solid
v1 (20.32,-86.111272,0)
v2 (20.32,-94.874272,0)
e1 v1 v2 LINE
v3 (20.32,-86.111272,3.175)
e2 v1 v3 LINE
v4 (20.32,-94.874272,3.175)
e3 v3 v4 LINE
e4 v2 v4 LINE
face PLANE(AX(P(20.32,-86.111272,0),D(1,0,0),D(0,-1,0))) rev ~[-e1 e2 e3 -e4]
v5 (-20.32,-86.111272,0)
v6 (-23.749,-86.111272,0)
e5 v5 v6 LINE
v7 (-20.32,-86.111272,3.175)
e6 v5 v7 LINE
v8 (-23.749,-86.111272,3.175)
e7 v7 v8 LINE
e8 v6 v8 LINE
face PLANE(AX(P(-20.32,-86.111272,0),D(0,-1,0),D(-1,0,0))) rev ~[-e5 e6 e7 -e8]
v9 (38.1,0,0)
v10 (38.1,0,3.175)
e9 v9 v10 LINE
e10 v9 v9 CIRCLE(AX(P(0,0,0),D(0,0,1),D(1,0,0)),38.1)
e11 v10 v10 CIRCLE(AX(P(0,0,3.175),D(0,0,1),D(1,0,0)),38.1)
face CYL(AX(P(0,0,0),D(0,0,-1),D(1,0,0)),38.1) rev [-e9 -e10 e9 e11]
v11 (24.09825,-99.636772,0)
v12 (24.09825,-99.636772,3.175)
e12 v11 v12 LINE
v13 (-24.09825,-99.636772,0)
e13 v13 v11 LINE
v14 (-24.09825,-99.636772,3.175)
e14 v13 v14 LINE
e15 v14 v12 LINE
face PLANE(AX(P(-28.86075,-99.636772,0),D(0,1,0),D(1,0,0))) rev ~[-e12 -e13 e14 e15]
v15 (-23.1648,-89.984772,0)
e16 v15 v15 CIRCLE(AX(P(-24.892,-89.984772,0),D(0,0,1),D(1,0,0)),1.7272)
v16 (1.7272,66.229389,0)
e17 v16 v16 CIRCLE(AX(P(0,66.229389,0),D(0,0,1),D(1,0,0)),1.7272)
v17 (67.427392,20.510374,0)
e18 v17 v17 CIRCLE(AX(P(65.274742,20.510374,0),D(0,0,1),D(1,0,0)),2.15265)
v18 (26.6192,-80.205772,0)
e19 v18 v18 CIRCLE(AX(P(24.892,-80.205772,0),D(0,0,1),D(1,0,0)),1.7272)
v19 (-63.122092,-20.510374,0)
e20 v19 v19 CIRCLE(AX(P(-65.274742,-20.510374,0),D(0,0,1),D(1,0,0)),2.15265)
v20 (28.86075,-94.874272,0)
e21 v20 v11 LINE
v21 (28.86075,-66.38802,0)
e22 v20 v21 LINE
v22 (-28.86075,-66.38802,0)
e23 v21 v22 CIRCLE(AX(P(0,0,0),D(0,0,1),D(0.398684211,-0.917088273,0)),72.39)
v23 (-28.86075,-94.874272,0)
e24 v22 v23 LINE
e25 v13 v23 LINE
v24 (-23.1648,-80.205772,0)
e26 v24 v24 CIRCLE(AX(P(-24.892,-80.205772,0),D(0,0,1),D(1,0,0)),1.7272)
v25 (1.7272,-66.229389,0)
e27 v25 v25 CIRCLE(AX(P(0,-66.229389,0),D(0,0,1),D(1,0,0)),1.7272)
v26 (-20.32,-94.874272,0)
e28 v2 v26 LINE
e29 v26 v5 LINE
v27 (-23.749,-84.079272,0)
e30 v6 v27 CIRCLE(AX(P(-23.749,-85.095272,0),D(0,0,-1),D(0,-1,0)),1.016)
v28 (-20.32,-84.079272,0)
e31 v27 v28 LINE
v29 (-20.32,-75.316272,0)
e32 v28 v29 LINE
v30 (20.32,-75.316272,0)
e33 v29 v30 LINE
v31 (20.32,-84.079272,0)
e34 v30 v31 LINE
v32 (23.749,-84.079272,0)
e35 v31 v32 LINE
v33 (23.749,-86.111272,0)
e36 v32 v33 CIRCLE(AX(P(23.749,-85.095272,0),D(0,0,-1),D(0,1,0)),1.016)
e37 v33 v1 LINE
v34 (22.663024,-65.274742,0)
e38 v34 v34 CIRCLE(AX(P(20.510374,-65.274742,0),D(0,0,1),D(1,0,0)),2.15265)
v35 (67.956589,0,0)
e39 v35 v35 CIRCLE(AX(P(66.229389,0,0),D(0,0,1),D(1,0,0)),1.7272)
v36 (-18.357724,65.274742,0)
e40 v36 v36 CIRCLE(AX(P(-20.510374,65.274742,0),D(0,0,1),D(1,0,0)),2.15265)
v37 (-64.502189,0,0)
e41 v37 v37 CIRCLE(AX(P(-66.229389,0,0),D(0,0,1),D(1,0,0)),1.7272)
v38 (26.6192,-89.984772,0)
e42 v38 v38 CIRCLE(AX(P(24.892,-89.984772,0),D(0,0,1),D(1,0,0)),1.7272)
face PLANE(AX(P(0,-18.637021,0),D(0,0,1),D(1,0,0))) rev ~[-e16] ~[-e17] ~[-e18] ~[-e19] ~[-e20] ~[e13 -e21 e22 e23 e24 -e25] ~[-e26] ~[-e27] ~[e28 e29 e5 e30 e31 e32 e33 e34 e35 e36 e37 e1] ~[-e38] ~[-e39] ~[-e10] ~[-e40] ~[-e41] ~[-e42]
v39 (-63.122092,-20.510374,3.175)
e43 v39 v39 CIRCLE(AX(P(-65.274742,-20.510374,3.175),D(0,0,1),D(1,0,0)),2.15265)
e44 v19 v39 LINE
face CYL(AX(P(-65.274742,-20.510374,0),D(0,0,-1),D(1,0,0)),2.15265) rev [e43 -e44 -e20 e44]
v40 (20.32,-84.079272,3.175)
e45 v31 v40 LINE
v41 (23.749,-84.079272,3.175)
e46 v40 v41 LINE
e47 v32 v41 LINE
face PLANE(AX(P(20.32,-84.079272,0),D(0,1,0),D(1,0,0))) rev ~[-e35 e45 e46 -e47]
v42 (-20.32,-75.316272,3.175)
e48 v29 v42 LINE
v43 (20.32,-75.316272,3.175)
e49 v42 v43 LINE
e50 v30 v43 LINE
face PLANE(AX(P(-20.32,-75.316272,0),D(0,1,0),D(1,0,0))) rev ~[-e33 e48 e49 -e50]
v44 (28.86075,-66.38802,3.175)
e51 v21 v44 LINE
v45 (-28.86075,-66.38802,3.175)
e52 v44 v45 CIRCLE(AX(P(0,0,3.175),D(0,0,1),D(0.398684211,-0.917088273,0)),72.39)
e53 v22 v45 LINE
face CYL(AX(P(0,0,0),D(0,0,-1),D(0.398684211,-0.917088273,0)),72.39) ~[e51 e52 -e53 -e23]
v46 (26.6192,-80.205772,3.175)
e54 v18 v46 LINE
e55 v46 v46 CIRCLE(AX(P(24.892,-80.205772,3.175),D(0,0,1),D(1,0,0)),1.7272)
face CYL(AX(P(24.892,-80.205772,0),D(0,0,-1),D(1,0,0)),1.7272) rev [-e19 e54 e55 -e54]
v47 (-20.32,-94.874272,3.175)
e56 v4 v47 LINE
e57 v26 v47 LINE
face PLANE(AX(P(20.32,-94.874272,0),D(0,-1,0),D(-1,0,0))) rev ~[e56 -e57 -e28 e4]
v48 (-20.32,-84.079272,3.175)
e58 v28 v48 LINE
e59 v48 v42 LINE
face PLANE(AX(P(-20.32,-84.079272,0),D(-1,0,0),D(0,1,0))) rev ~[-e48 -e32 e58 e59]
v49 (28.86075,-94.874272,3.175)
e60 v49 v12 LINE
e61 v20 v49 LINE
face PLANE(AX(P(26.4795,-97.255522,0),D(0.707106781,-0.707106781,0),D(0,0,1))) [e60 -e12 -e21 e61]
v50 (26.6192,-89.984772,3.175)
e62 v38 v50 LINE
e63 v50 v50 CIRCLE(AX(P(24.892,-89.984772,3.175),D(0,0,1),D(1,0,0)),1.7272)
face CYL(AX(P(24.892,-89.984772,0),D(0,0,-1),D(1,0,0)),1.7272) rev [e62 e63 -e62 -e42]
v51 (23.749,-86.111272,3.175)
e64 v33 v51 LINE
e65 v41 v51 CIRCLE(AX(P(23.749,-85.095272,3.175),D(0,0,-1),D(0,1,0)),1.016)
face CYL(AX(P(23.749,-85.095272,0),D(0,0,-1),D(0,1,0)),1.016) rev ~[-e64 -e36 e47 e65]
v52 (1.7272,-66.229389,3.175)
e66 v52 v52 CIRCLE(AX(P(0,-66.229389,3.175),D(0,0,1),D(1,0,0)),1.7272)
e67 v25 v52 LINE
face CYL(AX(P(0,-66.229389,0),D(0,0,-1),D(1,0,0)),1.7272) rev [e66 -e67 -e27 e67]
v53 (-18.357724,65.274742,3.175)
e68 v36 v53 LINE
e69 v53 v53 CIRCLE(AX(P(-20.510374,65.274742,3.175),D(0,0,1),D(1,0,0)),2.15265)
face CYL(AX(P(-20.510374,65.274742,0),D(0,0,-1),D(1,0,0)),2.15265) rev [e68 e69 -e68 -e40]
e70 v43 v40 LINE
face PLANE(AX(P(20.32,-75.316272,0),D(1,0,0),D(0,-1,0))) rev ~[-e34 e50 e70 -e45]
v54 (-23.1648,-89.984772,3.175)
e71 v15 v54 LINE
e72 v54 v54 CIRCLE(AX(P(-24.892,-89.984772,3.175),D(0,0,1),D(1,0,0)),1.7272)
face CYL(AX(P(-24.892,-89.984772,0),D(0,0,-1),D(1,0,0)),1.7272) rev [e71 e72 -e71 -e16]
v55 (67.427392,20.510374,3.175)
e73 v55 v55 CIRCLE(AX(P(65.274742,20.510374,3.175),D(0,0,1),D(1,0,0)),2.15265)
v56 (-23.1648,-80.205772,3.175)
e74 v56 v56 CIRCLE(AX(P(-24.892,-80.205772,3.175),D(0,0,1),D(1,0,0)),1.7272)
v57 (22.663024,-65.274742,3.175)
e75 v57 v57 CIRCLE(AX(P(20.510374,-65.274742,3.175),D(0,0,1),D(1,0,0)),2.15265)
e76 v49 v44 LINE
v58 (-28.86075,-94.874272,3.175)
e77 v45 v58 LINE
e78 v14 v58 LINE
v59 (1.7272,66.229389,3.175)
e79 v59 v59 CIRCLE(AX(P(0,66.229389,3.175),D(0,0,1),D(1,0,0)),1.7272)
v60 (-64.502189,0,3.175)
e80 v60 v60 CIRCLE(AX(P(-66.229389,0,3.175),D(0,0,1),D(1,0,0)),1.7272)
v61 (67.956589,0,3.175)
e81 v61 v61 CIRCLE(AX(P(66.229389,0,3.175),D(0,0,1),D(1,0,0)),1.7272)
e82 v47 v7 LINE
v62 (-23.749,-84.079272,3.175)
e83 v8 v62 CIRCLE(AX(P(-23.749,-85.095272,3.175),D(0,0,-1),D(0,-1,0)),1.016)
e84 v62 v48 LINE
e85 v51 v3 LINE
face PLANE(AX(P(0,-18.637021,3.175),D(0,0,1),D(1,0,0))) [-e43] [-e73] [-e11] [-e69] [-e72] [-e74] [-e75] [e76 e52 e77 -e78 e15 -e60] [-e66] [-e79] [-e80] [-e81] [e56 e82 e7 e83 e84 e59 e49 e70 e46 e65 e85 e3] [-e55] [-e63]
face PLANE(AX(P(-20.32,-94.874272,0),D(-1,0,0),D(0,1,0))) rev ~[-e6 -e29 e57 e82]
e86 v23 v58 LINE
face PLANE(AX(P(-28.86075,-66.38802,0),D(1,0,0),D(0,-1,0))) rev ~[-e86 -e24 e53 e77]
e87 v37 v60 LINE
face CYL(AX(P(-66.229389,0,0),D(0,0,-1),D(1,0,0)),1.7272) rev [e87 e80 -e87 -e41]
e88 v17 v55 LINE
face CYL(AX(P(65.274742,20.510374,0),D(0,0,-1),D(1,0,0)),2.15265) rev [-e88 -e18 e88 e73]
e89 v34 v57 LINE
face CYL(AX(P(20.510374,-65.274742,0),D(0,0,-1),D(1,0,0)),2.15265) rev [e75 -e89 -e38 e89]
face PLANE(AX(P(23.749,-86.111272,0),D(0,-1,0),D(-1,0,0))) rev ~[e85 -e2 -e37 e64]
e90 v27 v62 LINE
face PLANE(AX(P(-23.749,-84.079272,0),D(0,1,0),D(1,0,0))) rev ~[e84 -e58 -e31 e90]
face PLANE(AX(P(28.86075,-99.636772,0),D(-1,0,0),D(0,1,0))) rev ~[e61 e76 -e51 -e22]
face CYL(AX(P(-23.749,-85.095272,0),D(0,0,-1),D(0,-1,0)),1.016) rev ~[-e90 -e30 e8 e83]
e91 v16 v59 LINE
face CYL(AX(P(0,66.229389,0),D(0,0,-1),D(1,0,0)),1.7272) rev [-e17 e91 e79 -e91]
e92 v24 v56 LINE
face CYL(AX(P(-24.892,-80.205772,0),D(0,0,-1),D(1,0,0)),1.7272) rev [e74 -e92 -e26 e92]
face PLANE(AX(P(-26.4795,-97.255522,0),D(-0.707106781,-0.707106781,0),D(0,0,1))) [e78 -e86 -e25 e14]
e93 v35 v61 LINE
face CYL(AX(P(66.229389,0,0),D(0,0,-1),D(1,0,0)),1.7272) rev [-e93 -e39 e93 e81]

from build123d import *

# Parameters (mm, degrees)
F0_R     = 1.7272
F0_R_2   = 2.15265
F0_R_3   = 38.1
F1_DEPTH = 3.175
F2_SIZE  = 4.7625


# Not quite as in the source:
# - a feature names something its author has since deleted; it is built from what else it names


with BuildPart() as f1:
    # F0 (on Top) → F1 (new body)
    with BuildSketch(Plane.XY):
        with BuildLine():
            Line((28.86075, -99.6367724936), (28.86075, -66.3880200747))
            ThreePointArc((28.86075, -66.3880200747), (0, 72.39), (-28.86075, -66.3880200747))
            Line((-28.86075, -66.3880200747), (-28.86075, -99.6367724936))
            Line((-28.86075, -99.6367724936), (28.86075, -99.6367724936))
        make_face()
        with Locations((-24.892, -89.9847724936)):
            Circle(F0_R, mode=Mode.SUBTRACT)
        with Locations((-24.892, -80.2057724936)):
            Circle(F0_R, mode=Mode.SUBTRACT)
        with Locations((-65.2747423649, -20.5103744665)):
            Circle(F0_R_2, mode=Mode.SUBTRACT)
        with BuildLine():
            Line((-20.32, -94.8742724936), (-20.32, -86.1112724936))
            Line((-20.32, -86.1112724936), (-23.749, -86.1112724936))
            ThreePointArc((-23.749, -86.1112724936), (-24.765, -85.0952724936), (-23.749, -84.0792724936))
            Line((-23.749, -84.0792724936), (-20.32, -84.0792724936))
            Line((-20.32, -84.0792724936), (-20.32, -75.3162724936))
            Line((-20.32, -75.3162724936), (20.32, -75.3162724936))
            Line((20.32, -75.3162724936), (20.32, -84.0792724936))
            Line((20.32, -84.0792724936), (23.749, -84.0792724936))
            ThreePointArc((23.749, -84.0792724936), (24.765, -85.0952724936), (23.749, -86.1112724936))
            Line((23.749, -86.1112724936), (20.32, -86.1112724936))
            Line((20.32, -86.1112724936), (20.32, -94.8742724936))
            Line((20.32, -94.8742724936), (-20.32, -94.8742724936))
        make_face(mode=Mode.SUBTRACT)
        with Locations((24.892, -89.9847724936)):
            Circle(F0_R, mode=Mode.SUBTRACT)
        with Locations((24.892, -80.2057724936)):
            Circle(F0_R, mode=Mode.SUBTRACT)
        with Locations((0, -66.2293888929)):
            Circle(F0_R, mode=Mode.SUBTRACT)
        with Locations((20.5103744665, -65.2747423649)):
            Circle(F0_R_2, mode=Mode.SUBTRACT)
        with Locations((-66.2293888929, 0)):
            Circle(F0_R, mode=Mode.SUBTRACT)
        with Locations((-20.5103744665, 65.2747423649)):
            Circle(F0_R_2, mode=Mode.SUBTRACT)
        Circle(F0_R_3, mode=Mode.SUBTRACT)
        with Locations((66.2293888929, 0)):
            Circle(F0_R, mode=Mode.SUBTRACT)
        with Locations((65.2747423649, 20.5103744665)):
            Circle(F0_R_2, mode=Mode.SUBTRACT)
        with Locations((0, 66.2293888929)):
            Circle(F0_R, mode=Mode.SUBTRACT)
    extrude(amount=F1_DEPTH)

    # F2
    f2_edges = [f1.edges().sort_by_distance(p)[0] for p in [
        (-28.86075, -99.636772, 1.5875),
        (28.86075, -99.636772, 1.5875),
    ]]
    chamfer(f2_edges, length=F2_SIZE)


solid = f1.part
